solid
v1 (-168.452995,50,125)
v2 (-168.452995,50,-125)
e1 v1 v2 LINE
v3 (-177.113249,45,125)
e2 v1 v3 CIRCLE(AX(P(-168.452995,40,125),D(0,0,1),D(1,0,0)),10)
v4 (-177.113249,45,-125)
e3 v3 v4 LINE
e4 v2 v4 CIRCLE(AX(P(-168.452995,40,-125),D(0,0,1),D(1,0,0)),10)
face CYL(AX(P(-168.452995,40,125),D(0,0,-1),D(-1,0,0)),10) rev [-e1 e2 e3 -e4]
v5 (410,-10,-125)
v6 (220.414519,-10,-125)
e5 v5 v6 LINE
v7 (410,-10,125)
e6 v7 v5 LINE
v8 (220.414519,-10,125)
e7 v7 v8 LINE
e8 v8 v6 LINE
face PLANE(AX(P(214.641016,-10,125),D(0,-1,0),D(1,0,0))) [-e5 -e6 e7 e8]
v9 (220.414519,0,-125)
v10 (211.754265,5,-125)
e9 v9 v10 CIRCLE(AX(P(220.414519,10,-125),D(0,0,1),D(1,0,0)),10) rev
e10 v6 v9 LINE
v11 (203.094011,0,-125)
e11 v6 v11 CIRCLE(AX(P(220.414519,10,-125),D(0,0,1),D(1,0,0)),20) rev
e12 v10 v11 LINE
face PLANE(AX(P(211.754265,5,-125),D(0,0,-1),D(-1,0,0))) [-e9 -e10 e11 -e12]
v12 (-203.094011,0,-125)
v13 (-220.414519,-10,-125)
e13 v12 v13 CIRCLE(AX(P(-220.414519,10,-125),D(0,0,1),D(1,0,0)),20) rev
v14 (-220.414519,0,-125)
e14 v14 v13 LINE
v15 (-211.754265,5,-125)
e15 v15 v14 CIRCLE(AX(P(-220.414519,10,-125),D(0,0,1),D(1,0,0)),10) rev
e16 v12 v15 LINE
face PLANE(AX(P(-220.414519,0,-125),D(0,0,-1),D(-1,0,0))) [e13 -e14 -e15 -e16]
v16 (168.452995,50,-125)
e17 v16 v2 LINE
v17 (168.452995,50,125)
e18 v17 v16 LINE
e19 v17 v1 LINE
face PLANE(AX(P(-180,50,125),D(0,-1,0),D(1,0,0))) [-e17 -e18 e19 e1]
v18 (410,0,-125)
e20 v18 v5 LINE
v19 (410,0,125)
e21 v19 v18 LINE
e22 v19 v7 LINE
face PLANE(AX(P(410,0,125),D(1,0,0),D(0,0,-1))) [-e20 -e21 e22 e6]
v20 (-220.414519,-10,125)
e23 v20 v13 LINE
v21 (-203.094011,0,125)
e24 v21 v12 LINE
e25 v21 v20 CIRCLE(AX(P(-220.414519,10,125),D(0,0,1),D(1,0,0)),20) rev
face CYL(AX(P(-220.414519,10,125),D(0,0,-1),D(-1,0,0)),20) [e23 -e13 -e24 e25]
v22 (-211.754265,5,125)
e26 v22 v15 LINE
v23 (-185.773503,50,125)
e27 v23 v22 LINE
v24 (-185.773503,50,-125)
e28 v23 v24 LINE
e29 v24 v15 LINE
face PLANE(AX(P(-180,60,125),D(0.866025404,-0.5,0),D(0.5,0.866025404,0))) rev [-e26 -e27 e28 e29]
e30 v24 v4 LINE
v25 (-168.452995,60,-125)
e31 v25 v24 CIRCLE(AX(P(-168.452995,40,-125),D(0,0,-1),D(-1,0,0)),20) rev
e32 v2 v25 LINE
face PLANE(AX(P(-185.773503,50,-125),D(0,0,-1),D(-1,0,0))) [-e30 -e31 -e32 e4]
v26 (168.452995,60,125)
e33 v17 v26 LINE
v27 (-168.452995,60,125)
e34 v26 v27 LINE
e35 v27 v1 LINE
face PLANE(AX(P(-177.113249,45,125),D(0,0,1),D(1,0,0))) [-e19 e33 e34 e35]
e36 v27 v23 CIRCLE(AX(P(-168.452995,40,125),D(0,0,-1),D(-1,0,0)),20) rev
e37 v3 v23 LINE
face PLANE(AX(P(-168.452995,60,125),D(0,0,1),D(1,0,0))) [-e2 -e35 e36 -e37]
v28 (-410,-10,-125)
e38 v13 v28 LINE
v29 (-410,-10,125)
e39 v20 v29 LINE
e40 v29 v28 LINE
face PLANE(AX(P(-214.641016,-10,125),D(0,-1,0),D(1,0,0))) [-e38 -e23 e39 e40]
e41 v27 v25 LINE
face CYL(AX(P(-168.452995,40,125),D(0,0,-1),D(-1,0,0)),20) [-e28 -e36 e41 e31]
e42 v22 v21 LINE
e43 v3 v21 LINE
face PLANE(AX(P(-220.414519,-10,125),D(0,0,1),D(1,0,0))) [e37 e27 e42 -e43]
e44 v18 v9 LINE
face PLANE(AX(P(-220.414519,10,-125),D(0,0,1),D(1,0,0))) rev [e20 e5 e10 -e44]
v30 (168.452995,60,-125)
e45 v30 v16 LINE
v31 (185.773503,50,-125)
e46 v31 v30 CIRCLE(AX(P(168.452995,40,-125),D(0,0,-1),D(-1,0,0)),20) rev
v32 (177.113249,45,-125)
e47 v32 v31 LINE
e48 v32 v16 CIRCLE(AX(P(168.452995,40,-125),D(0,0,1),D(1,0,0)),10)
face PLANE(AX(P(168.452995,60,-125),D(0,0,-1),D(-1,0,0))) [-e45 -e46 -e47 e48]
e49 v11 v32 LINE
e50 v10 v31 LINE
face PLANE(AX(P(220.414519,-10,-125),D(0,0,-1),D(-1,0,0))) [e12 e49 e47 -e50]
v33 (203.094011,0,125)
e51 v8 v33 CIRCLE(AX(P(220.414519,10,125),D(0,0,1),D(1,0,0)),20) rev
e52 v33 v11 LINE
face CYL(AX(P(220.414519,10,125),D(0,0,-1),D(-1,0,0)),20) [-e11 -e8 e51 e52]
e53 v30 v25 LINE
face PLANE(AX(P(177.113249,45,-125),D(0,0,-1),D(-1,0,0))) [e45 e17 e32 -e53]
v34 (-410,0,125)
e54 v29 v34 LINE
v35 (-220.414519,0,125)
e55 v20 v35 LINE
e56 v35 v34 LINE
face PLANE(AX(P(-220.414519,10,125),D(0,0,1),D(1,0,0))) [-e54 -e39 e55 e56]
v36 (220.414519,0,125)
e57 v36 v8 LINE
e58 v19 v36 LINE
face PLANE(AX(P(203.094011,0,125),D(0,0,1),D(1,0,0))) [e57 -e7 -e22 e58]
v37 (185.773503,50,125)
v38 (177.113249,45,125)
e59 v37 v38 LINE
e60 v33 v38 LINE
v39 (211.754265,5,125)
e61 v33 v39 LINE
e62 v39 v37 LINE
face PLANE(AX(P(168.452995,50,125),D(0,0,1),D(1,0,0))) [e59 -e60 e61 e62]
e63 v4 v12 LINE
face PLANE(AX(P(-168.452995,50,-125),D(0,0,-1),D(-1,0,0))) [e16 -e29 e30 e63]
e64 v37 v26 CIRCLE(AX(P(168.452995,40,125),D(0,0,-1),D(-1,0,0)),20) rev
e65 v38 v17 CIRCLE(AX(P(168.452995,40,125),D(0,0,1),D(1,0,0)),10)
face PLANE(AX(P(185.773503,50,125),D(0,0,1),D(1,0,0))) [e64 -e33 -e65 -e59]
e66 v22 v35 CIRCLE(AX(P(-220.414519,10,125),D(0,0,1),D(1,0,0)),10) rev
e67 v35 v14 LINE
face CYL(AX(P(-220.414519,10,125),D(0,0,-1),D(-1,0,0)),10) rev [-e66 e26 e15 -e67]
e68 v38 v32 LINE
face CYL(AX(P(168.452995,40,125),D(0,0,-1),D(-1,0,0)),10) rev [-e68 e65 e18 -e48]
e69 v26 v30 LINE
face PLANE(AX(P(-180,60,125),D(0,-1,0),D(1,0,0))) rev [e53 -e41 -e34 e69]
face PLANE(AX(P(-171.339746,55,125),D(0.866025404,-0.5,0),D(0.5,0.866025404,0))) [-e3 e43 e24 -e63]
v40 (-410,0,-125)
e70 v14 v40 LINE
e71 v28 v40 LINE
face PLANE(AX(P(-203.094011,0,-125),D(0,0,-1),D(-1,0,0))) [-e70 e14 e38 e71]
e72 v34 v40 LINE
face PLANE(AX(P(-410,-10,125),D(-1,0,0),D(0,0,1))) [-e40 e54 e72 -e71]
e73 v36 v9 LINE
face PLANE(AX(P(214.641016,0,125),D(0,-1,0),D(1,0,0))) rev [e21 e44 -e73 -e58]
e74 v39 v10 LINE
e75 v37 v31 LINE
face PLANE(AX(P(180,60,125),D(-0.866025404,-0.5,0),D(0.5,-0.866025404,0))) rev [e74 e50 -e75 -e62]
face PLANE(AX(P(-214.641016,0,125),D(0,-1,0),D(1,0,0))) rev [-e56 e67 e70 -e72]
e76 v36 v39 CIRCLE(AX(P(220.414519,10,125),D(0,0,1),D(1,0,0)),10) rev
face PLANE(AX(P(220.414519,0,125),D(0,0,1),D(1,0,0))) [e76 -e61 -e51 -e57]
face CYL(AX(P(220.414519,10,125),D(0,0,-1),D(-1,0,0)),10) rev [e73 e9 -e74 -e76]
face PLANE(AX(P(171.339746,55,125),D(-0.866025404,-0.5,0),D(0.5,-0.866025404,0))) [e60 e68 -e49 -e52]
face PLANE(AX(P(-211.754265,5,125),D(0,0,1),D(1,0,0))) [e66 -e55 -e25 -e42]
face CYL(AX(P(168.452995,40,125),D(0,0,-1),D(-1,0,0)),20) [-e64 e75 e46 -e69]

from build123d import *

# Parameters (mm, degrees)
SM_BASE_FLANGE_1_DEPTH = 125


# Sheet-metal steps are written as plain solids
with BuildPart() as part:
    # Sketch 1 → 基体-法兰1 (new, symmetric)
    with BuildSketch(Plane.XY):
        with BuildLine():
            Line((-410, 0), (-220.414518843, 0))
            ThreePointArc((-220.414518843, 0), (-215.414518843, 1.339745962), (-211.754264805, 5))
            Line((-211.754264805, 5), (-185.773502692, 50))
            ThreePointArc((-185.773502692, 50), (-178.452994616, 57.320508076), (-168.452994616, 60))
            Line((-168.452994616, 60), (168.452994616, 60))
            ThreePointArc((168.452994616, 60), (178.452994616, 57.320508076), (185.773502692, 50))
            Line((185.773502692, 50), (211.754264805, 5))
            ThreePointArc((211.754264805, 5), (215.414518843, 1.339745962), (220.414518843, 0))
            Line((220.414518843, 0), (410, 0))
            Line((410, 0), (410, -10))
            Line((410, -10), (220.414518843, -10))
            ThreePointArc((220.414518843, -10), (210.414518843, -7.320508076), (203.094010768, 0))
            Line((203.094010768, 0), (177.113248654, 45))
            ThreePointArc((177.113248654, 45), (173.452994616, 48.660254038), (168.452994616, 50))
            Line((168.452994616, 50), (-168.452994616, 50))
            ThreePointArc((-168.452994616, 50), (-173.452994616, 48.660254038), (-177.113248654, 45))
            Line((-177.113248654, 45), (-203.094010768, 0))
            ThreePointArc((-203.094010768, 0), (-210.414518843, -7.320508076), (-220.414518843, -10))
            Line((-220.414518843, -10), (-410, -10))
            Line((-410, -10), (-410, 0))
        make_face()
    extrude(amount=SM_BASE_FLANGE_1_DEPTH, both=True)


solid = part.part
